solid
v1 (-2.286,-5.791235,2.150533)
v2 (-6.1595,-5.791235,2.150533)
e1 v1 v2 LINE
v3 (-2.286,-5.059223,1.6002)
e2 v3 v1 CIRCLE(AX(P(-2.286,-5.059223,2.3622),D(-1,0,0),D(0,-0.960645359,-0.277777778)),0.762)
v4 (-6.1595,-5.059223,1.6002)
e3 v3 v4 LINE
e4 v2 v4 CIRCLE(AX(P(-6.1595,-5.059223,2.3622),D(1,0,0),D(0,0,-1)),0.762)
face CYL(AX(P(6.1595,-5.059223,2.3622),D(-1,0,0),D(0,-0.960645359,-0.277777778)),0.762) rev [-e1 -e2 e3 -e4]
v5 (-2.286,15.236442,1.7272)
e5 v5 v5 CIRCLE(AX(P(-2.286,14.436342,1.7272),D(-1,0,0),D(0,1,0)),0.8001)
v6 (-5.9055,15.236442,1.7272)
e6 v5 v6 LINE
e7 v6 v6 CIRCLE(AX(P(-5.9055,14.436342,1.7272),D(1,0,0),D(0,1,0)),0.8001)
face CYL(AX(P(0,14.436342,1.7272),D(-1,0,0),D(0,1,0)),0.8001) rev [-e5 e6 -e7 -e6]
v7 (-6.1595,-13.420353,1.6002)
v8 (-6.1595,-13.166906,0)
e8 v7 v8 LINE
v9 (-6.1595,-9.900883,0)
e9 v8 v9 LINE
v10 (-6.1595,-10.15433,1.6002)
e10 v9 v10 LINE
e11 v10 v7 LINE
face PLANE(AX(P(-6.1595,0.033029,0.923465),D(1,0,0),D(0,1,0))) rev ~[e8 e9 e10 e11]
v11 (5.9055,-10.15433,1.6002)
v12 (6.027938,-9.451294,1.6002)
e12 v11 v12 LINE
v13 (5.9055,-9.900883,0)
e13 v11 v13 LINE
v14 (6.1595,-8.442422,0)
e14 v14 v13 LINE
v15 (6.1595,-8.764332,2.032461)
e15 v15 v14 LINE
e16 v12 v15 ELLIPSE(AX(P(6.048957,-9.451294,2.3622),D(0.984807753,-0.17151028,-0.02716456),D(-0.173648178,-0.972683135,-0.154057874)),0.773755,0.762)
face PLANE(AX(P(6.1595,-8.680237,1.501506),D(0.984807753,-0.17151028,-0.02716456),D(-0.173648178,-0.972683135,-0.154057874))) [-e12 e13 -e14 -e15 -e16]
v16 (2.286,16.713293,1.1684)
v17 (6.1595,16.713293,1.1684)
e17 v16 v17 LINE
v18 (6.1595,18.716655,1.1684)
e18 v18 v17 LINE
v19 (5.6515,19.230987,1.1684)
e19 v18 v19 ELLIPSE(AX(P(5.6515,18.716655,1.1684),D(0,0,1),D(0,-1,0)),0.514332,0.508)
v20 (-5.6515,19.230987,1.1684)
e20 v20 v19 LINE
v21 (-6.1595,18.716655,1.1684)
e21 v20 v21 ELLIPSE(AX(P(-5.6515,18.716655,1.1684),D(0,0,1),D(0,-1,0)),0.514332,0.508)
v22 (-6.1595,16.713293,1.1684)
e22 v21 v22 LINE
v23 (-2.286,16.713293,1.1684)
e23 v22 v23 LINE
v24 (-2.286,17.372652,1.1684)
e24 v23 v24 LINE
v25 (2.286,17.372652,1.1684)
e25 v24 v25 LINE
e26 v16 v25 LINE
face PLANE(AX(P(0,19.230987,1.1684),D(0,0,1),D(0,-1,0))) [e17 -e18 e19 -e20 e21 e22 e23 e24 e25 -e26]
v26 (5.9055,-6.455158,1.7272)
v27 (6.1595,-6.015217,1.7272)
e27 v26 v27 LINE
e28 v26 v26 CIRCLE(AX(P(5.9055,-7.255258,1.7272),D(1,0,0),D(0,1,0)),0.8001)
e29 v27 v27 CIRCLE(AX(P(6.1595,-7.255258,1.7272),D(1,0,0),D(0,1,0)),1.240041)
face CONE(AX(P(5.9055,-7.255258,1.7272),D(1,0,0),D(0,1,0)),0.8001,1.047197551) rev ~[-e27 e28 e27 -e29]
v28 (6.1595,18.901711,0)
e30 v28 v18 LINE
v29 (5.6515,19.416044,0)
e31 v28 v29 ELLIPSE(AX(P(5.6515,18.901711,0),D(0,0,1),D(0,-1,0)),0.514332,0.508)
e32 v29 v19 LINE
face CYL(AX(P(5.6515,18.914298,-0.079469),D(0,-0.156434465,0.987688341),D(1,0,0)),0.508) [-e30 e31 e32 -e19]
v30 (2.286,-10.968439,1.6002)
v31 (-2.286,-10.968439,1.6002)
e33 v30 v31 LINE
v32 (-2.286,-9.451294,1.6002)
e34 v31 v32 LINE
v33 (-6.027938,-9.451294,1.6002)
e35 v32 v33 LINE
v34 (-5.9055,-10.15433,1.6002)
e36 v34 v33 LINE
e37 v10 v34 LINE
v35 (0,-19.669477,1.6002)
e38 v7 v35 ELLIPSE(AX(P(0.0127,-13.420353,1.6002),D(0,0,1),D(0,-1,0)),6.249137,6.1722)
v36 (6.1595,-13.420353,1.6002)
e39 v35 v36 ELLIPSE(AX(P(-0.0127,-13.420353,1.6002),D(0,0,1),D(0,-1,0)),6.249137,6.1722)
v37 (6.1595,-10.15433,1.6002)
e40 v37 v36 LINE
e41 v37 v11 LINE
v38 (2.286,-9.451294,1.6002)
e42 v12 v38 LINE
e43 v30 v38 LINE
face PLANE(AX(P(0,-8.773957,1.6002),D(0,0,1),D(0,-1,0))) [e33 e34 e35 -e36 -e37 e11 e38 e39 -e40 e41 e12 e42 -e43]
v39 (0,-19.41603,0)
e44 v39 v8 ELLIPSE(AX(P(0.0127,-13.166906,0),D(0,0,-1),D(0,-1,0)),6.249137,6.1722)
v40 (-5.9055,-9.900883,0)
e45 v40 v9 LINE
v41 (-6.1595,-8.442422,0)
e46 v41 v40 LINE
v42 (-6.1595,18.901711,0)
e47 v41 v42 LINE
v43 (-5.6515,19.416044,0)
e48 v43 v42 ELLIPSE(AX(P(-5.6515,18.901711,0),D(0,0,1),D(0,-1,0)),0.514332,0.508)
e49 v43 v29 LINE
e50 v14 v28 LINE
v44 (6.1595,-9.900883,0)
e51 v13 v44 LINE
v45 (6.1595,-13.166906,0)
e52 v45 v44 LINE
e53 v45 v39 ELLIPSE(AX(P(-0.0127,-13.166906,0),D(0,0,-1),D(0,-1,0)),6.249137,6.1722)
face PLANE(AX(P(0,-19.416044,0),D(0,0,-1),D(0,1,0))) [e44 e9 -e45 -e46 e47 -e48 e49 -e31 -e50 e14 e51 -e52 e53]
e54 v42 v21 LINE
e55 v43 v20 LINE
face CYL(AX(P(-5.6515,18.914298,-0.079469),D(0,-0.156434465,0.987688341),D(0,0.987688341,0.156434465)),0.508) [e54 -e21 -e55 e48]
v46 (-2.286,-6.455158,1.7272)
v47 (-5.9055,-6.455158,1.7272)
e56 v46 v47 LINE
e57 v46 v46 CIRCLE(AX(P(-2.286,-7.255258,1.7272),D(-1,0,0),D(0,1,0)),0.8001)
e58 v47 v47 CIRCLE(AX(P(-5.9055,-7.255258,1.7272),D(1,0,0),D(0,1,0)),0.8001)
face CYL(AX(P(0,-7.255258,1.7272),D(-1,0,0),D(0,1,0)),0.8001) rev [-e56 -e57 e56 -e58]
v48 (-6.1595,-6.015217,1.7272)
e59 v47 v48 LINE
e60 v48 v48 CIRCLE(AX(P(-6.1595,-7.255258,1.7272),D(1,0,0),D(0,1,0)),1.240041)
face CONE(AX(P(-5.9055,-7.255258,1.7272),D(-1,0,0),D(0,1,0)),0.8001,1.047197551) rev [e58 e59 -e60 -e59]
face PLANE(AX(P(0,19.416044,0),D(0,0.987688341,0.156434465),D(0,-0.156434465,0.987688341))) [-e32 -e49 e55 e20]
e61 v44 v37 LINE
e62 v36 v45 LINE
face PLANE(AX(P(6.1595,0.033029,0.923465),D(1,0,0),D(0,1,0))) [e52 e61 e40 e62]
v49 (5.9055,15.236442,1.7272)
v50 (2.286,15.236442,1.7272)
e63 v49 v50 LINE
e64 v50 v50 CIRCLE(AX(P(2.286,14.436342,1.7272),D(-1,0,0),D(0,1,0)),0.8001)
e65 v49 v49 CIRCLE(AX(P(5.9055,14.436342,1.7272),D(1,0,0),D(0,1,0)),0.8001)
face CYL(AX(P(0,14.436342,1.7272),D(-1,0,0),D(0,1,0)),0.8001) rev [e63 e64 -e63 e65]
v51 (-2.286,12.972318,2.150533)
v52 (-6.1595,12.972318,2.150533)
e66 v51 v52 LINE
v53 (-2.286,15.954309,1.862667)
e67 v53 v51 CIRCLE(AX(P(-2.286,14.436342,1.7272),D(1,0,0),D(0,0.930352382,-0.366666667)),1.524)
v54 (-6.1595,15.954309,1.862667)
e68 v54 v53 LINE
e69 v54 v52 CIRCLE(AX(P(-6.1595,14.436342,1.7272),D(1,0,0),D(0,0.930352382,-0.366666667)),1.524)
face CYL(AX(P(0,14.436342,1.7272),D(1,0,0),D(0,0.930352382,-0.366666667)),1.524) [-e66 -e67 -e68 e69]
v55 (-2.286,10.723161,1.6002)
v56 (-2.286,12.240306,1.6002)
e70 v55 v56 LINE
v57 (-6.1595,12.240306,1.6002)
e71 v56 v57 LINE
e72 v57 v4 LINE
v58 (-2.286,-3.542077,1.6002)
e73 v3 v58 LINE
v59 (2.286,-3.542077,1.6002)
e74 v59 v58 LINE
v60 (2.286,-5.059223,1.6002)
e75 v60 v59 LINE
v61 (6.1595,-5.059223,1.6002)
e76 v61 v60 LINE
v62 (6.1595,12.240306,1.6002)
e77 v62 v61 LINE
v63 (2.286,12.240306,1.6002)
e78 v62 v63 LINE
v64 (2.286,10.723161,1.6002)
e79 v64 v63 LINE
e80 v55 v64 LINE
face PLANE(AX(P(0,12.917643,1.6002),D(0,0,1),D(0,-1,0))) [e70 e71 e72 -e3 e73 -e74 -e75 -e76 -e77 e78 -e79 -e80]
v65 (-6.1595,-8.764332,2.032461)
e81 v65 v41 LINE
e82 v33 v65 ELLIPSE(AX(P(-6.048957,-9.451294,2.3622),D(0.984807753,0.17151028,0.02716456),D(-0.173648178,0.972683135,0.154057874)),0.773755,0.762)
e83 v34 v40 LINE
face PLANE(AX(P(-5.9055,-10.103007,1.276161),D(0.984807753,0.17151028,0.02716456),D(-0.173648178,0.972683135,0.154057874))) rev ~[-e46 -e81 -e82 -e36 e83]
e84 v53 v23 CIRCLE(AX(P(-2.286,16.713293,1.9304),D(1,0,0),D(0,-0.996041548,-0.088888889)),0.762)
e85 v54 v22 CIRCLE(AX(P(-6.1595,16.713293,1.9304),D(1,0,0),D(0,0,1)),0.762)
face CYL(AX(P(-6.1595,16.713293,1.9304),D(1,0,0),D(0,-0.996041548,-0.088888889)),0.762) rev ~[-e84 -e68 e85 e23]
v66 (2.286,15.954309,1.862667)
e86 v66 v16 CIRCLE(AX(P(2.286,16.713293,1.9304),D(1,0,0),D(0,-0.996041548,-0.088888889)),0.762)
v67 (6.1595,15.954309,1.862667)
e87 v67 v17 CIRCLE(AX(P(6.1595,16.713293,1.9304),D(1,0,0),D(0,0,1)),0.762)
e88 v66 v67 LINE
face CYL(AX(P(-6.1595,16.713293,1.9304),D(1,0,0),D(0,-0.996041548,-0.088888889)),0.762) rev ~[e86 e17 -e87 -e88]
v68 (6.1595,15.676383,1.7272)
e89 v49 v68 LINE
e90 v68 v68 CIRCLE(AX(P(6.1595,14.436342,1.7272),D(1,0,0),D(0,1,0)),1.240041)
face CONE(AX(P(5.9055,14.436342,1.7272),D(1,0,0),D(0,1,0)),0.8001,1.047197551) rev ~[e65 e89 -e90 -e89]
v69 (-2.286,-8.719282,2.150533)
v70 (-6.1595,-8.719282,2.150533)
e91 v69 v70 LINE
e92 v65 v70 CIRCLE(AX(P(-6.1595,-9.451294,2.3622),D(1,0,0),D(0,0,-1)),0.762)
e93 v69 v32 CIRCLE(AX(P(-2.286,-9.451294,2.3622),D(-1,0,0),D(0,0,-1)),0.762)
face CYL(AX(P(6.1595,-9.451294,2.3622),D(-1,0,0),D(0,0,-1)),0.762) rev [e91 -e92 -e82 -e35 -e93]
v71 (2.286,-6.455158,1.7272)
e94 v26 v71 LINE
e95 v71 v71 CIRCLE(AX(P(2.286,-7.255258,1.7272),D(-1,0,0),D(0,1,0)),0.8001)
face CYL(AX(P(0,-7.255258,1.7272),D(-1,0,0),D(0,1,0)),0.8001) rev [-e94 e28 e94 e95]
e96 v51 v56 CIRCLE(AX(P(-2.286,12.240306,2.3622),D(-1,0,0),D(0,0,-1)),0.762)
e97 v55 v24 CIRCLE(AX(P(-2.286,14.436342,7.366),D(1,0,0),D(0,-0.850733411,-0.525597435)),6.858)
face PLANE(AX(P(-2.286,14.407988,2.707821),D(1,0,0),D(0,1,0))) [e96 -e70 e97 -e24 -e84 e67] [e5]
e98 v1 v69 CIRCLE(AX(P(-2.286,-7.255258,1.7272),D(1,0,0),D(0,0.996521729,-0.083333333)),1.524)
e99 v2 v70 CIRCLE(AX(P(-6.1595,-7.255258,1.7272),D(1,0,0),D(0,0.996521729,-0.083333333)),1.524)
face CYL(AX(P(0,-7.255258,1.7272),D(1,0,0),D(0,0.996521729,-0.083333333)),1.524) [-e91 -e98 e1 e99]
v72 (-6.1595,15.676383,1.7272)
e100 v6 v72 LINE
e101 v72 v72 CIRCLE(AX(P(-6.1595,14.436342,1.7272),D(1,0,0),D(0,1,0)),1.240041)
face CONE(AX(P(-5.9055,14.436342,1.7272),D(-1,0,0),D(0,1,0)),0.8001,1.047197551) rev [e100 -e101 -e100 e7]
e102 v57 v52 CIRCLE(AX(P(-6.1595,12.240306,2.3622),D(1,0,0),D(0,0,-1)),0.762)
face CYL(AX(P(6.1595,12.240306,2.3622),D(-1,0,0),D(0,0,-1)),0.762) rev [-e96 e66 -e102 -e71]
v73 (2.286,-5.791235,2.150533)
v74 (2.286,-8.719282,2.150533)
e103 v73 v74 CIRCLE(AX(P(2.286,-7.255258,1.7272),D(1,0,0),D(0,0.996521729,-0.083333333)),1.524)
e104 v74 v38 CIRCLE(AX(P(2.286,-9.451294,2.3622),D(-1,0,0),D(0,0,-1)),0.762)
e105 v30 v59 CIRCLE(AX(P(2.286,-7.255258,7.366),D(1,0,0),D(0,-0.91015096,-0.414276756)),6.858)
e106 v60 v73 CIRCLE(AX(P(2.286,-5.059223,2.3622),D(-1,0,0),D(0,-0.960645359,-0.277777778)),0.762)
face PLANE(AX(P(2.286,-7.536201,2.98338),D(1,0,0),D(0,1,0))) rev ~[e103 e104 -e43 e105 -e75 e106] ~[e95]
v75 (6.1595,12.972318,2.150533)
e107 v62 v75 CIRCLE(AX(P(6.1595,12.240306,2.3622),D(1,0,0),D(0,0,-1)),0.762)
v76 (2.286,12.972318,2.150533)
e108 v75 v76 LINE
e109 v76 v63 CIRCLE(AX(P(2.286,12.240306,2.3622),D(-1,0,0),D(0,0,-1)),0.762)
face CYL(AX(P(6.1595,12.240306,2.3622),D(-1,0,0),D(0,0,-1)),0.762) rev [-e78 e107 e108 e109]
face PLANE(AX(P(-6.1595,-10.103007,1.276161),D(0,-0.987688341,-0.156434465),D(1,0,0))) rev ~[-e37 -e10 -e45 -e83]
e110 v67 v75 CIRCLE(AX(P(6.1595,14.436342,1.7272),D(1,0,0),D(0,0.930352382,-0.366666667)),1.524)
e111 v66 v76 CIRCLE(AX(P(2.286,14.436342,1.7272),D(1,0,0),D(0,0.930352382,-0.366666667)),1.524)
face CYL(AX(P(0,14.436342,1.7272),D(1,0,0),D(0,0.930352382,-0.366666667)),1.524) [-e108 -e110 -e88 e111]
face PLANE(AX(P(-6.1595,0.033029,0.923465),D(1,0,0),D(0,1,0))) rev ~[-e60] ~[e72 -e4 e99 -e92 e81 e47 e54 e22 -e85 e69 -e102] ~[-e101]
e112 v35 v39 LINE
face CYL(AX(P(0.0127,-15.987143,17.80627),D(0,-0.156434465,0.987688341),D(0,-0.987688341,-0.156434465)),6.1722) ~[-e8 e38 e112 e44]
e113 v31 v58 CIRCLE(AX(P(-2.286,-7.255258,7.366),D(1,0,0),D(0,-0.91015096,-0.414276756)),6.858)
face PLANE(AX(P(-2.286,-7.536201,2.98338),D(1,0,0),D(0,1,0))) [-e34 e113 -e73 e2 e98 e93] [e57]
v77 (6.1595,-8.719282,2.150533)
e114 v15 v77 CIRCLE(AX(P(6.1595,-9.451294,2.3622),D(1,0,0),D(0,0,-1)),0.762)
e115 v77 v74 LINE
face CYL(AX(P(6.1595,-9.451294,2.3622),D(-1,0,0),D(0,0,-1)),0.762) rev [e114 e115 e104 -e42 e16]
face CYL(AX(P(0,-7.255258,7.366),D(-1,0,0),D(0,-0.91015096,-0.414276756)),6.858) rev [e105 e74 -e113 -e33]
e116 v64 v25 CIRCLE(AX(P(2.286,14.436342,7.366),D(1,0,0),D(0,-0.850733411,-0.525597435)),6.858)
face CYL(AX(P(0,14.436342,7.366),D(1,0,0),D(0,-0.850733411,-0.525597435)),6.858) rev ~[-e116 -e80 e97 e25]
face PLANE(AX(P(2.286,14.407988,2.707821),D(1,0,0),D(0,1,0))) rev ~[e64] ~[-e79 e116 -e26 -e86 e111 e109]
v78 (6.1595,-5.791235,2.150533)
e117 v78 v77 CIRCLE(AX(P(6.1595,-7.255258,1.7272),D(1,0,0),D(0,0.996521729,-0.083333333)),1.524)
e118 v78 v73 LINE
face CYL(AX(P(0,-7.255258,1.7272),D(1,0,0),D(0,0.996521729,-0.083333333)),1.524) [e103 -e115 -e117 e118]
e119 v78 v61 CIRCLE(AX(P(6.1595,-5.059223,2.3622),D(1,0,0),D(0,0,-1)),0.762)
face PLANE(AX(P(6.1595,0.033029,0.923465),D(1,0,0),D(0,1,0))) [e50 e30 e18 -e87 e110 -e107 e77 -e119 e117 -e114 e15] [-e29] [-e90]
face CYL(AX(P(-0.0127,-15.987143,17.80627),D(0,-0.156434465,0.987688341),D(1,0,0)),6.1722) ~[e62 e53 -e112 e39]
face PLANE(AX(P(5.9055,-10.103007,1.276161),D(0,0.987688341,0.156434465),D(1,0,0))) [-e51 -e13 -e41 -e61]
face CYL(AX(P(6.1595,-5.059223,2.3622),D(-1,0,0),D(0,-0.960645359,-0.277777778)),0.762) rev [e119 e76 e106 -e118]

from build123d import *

# Parameters (mm, degrees)
F0_R        = 0.8001
F1_DEPTH    = 6.1595
F2_R        = 0.762
F3_SIZE2    = 0.4399409051
F3_SIZE     = 0.254
F3_2_SIZE2  = 0.4399409051
F3_2_SIZE   = 0.254
F4_SIZE2    = 0.4399409051
F4_SIZE     = 0.254
F6_DEPTH    = 2.286
F8_R        = 0.508
F9_T1_DEPTH = 32.4811466943
F11_DEPTH   = 12.7


# Not quite as in the source:
# - a fillet or chamfer that OpenCascade refuses, or shapes differently, is made with other operations: its cross-section is extruded or revolved along the edge and cut away or added


with BuildPart() as f1:
    # F0 (on Right) → F1 (new body, symmetric)
    with BuildSketch(Plane.YZ):
        with BuildLine():
            Line((-19.6694904986, 1.6002), (-19.4160437172, 0))
            Line((-19.4160437172, 0), (19.4160437172, 0))
            Line((19.4160437172, 0), (19.2309873372, 1.1684))
            Line((19.2309873372, 1.1684), (15.8541987451, 1.1684))
            ThreePointArc((15.8541987451, 1.1684), (14.6580511896, 3.2349867583), (12.9176425998, 1.6002))
            Line((12.9176425998, 1.6002), (-5.7365591714, 1.6002))
            ThreePointArc((-5.7365591714, 1.6002), (-7.2552582858, 3.2512), (-8.7739574002, 1.6002))
            Line((-8.7739574002, 1.6002), (-19.6694904986, 1.6002))
        make_face()
        with Locations((-7.2552582858, 1.7272)):
            Circle(F0_R, mode=Mode.SUBTRACT)
        with Locations((14.4363417142, 1.7272)):
            Circle(F0_R, mode=Mode.SUBTRACT)
    extrude(amount=F1_DEPTH, both=True)

    # F2
    f2_edges = [f1.edges().sort_by_distance(p)[0] for p in [
        (0, -8.773957, 1.6002),
        (0, -5.736559, 1.6002),
        (0, 12.917643, 1.6002),
        (0, 15.854199, 1.1684),
    ]]
    fillet(f2_edges, radius=F2_R)

    # F3
    f3_edges = [f1.edges().sort_by_distance(p)[0] for p in [
        (6.1595, -8.055358, 1.7272),
        (-6.1595, -8.055358, 1.7272),
    ]]
    f3_side = f1.faces().sort_by_distance((0, -8.055358, 1.7272))[0]
    chamfer(f3_edges, length=F3_SIZE, length2=F3_SIZE2, reference=f3_side)

    # F3#2
    f3_2_edges = [f1.edges().sort_by_distance(p)[0] for p in [
        (6.1595, 13.636242, 1.7272),
    ]]
    f3_2_side = f1.faces().sort_by_distance((0, 13.636242, 1.7272))[0]
    chamfer(f3_2_edges, length=F3_2_SIZE, length2=F3_2_SIZE2, reference=f3_2_side)

    # F4
    f4_edges = [f1.edges().sort_by_distance(p)[0] for p in [
        (-6.1595, 13.636242, 1.7272),
    ]]
    f4_side = f1.faces().sort_by_distance((-0.127, 13.636242, 1.7272))[0]
    chamfer(f4_edges, length=F4_SIZE, length2=F4_SIZE2, reference=f4_side)

    # F5 (on Right) → F6 (cut, symmetric)
    with BuildSketch(Plane.YZ):
        with BuildLine():
            Line((-1.4272936791, 3.7511704683), (-13.4970735674, 4.5248900073))
            ThreePointArc((-13.4970735674, 4.5248900073), (-7.6939820902, 0.5220475291), (-1.4272936791, 3.7511704683))
        make_face()
        with BuildLine():
            Line((20.2263604549, 3.6906977019), (8.6020119823, 3.7614527913))
            ThreePointArc((8.6020119823, 3.7614527913), (14.3945992101, 0.508127038), (20.2263604549, 3.6906977019))
        make_face()
    extrude(amount=F6_DEPTH, both=True, mode=Mode.SUBTRACT)

    # F8
    f8_edges = [f1.edges().sort_by_distance(p)[0] for p in [
        (6.1595, 19.323516, 0.5842),
        (-6.1595, 19.323516, 0.5842),
    ]]
    fillet(f8_edges, radius=F8_R)

    # F9: fillet of radius 6.1722 on 2 edges, made by hand

    # F9_s2 → F9_t1 (cut)
    with BuildSketch(Plane(origin=(0, -3.1424532039, 19.8406686756), x_dir=(1, 0, 0), z_dir=(0, 0.156434465, -0.9876883406))):
        with BuildLine():
            ThreePointArc((6.1595, 13.0048), (4.3517044748, 17.3692044748), (-0.0127, 19.177))
            Line((-0.0127, 19.177), (6.1595, 19.177))
            Line((6.1595, 19.177), (6.1595, 13.0048))
        make_face()
        with BuildLine():
            ThreePointArc((0.0127, 19.177), (-4.3517044748, 17.3692044748), (-6.1595, 13.0048))
            Line((-6.1595, 13.0048), (-6.1595, 19.177))
            Line((-6.1595, 19.177), (0.0127, 19.177))
        make_face()
    extrude(amount=F9_T1_DEPTH, mode=Mode.SUBTRACT)

    # F10 (on line) → F11 (cut, symmetric)
    with BuildSketch(Plane(origin=(0, -0.4444158842, 2.8059314619), x_dir=(1, 0, 0), z_dir=(0, -0.156434465, 0.9876883406))):
        Polygon((5.9055, -9.7789869341), (6.1595, -9.7789869341), (6.1595, -8.338481352), align=None)
        Polygon((-6.1595, -8.338481352), (-6.1595, -9.7789869341), (-5.9055, -9.7789869341), align=None)
    extrude(amount=F11_DEPTH, both=True, mode=Mode.SUBTRACT)


solid = f1.part
